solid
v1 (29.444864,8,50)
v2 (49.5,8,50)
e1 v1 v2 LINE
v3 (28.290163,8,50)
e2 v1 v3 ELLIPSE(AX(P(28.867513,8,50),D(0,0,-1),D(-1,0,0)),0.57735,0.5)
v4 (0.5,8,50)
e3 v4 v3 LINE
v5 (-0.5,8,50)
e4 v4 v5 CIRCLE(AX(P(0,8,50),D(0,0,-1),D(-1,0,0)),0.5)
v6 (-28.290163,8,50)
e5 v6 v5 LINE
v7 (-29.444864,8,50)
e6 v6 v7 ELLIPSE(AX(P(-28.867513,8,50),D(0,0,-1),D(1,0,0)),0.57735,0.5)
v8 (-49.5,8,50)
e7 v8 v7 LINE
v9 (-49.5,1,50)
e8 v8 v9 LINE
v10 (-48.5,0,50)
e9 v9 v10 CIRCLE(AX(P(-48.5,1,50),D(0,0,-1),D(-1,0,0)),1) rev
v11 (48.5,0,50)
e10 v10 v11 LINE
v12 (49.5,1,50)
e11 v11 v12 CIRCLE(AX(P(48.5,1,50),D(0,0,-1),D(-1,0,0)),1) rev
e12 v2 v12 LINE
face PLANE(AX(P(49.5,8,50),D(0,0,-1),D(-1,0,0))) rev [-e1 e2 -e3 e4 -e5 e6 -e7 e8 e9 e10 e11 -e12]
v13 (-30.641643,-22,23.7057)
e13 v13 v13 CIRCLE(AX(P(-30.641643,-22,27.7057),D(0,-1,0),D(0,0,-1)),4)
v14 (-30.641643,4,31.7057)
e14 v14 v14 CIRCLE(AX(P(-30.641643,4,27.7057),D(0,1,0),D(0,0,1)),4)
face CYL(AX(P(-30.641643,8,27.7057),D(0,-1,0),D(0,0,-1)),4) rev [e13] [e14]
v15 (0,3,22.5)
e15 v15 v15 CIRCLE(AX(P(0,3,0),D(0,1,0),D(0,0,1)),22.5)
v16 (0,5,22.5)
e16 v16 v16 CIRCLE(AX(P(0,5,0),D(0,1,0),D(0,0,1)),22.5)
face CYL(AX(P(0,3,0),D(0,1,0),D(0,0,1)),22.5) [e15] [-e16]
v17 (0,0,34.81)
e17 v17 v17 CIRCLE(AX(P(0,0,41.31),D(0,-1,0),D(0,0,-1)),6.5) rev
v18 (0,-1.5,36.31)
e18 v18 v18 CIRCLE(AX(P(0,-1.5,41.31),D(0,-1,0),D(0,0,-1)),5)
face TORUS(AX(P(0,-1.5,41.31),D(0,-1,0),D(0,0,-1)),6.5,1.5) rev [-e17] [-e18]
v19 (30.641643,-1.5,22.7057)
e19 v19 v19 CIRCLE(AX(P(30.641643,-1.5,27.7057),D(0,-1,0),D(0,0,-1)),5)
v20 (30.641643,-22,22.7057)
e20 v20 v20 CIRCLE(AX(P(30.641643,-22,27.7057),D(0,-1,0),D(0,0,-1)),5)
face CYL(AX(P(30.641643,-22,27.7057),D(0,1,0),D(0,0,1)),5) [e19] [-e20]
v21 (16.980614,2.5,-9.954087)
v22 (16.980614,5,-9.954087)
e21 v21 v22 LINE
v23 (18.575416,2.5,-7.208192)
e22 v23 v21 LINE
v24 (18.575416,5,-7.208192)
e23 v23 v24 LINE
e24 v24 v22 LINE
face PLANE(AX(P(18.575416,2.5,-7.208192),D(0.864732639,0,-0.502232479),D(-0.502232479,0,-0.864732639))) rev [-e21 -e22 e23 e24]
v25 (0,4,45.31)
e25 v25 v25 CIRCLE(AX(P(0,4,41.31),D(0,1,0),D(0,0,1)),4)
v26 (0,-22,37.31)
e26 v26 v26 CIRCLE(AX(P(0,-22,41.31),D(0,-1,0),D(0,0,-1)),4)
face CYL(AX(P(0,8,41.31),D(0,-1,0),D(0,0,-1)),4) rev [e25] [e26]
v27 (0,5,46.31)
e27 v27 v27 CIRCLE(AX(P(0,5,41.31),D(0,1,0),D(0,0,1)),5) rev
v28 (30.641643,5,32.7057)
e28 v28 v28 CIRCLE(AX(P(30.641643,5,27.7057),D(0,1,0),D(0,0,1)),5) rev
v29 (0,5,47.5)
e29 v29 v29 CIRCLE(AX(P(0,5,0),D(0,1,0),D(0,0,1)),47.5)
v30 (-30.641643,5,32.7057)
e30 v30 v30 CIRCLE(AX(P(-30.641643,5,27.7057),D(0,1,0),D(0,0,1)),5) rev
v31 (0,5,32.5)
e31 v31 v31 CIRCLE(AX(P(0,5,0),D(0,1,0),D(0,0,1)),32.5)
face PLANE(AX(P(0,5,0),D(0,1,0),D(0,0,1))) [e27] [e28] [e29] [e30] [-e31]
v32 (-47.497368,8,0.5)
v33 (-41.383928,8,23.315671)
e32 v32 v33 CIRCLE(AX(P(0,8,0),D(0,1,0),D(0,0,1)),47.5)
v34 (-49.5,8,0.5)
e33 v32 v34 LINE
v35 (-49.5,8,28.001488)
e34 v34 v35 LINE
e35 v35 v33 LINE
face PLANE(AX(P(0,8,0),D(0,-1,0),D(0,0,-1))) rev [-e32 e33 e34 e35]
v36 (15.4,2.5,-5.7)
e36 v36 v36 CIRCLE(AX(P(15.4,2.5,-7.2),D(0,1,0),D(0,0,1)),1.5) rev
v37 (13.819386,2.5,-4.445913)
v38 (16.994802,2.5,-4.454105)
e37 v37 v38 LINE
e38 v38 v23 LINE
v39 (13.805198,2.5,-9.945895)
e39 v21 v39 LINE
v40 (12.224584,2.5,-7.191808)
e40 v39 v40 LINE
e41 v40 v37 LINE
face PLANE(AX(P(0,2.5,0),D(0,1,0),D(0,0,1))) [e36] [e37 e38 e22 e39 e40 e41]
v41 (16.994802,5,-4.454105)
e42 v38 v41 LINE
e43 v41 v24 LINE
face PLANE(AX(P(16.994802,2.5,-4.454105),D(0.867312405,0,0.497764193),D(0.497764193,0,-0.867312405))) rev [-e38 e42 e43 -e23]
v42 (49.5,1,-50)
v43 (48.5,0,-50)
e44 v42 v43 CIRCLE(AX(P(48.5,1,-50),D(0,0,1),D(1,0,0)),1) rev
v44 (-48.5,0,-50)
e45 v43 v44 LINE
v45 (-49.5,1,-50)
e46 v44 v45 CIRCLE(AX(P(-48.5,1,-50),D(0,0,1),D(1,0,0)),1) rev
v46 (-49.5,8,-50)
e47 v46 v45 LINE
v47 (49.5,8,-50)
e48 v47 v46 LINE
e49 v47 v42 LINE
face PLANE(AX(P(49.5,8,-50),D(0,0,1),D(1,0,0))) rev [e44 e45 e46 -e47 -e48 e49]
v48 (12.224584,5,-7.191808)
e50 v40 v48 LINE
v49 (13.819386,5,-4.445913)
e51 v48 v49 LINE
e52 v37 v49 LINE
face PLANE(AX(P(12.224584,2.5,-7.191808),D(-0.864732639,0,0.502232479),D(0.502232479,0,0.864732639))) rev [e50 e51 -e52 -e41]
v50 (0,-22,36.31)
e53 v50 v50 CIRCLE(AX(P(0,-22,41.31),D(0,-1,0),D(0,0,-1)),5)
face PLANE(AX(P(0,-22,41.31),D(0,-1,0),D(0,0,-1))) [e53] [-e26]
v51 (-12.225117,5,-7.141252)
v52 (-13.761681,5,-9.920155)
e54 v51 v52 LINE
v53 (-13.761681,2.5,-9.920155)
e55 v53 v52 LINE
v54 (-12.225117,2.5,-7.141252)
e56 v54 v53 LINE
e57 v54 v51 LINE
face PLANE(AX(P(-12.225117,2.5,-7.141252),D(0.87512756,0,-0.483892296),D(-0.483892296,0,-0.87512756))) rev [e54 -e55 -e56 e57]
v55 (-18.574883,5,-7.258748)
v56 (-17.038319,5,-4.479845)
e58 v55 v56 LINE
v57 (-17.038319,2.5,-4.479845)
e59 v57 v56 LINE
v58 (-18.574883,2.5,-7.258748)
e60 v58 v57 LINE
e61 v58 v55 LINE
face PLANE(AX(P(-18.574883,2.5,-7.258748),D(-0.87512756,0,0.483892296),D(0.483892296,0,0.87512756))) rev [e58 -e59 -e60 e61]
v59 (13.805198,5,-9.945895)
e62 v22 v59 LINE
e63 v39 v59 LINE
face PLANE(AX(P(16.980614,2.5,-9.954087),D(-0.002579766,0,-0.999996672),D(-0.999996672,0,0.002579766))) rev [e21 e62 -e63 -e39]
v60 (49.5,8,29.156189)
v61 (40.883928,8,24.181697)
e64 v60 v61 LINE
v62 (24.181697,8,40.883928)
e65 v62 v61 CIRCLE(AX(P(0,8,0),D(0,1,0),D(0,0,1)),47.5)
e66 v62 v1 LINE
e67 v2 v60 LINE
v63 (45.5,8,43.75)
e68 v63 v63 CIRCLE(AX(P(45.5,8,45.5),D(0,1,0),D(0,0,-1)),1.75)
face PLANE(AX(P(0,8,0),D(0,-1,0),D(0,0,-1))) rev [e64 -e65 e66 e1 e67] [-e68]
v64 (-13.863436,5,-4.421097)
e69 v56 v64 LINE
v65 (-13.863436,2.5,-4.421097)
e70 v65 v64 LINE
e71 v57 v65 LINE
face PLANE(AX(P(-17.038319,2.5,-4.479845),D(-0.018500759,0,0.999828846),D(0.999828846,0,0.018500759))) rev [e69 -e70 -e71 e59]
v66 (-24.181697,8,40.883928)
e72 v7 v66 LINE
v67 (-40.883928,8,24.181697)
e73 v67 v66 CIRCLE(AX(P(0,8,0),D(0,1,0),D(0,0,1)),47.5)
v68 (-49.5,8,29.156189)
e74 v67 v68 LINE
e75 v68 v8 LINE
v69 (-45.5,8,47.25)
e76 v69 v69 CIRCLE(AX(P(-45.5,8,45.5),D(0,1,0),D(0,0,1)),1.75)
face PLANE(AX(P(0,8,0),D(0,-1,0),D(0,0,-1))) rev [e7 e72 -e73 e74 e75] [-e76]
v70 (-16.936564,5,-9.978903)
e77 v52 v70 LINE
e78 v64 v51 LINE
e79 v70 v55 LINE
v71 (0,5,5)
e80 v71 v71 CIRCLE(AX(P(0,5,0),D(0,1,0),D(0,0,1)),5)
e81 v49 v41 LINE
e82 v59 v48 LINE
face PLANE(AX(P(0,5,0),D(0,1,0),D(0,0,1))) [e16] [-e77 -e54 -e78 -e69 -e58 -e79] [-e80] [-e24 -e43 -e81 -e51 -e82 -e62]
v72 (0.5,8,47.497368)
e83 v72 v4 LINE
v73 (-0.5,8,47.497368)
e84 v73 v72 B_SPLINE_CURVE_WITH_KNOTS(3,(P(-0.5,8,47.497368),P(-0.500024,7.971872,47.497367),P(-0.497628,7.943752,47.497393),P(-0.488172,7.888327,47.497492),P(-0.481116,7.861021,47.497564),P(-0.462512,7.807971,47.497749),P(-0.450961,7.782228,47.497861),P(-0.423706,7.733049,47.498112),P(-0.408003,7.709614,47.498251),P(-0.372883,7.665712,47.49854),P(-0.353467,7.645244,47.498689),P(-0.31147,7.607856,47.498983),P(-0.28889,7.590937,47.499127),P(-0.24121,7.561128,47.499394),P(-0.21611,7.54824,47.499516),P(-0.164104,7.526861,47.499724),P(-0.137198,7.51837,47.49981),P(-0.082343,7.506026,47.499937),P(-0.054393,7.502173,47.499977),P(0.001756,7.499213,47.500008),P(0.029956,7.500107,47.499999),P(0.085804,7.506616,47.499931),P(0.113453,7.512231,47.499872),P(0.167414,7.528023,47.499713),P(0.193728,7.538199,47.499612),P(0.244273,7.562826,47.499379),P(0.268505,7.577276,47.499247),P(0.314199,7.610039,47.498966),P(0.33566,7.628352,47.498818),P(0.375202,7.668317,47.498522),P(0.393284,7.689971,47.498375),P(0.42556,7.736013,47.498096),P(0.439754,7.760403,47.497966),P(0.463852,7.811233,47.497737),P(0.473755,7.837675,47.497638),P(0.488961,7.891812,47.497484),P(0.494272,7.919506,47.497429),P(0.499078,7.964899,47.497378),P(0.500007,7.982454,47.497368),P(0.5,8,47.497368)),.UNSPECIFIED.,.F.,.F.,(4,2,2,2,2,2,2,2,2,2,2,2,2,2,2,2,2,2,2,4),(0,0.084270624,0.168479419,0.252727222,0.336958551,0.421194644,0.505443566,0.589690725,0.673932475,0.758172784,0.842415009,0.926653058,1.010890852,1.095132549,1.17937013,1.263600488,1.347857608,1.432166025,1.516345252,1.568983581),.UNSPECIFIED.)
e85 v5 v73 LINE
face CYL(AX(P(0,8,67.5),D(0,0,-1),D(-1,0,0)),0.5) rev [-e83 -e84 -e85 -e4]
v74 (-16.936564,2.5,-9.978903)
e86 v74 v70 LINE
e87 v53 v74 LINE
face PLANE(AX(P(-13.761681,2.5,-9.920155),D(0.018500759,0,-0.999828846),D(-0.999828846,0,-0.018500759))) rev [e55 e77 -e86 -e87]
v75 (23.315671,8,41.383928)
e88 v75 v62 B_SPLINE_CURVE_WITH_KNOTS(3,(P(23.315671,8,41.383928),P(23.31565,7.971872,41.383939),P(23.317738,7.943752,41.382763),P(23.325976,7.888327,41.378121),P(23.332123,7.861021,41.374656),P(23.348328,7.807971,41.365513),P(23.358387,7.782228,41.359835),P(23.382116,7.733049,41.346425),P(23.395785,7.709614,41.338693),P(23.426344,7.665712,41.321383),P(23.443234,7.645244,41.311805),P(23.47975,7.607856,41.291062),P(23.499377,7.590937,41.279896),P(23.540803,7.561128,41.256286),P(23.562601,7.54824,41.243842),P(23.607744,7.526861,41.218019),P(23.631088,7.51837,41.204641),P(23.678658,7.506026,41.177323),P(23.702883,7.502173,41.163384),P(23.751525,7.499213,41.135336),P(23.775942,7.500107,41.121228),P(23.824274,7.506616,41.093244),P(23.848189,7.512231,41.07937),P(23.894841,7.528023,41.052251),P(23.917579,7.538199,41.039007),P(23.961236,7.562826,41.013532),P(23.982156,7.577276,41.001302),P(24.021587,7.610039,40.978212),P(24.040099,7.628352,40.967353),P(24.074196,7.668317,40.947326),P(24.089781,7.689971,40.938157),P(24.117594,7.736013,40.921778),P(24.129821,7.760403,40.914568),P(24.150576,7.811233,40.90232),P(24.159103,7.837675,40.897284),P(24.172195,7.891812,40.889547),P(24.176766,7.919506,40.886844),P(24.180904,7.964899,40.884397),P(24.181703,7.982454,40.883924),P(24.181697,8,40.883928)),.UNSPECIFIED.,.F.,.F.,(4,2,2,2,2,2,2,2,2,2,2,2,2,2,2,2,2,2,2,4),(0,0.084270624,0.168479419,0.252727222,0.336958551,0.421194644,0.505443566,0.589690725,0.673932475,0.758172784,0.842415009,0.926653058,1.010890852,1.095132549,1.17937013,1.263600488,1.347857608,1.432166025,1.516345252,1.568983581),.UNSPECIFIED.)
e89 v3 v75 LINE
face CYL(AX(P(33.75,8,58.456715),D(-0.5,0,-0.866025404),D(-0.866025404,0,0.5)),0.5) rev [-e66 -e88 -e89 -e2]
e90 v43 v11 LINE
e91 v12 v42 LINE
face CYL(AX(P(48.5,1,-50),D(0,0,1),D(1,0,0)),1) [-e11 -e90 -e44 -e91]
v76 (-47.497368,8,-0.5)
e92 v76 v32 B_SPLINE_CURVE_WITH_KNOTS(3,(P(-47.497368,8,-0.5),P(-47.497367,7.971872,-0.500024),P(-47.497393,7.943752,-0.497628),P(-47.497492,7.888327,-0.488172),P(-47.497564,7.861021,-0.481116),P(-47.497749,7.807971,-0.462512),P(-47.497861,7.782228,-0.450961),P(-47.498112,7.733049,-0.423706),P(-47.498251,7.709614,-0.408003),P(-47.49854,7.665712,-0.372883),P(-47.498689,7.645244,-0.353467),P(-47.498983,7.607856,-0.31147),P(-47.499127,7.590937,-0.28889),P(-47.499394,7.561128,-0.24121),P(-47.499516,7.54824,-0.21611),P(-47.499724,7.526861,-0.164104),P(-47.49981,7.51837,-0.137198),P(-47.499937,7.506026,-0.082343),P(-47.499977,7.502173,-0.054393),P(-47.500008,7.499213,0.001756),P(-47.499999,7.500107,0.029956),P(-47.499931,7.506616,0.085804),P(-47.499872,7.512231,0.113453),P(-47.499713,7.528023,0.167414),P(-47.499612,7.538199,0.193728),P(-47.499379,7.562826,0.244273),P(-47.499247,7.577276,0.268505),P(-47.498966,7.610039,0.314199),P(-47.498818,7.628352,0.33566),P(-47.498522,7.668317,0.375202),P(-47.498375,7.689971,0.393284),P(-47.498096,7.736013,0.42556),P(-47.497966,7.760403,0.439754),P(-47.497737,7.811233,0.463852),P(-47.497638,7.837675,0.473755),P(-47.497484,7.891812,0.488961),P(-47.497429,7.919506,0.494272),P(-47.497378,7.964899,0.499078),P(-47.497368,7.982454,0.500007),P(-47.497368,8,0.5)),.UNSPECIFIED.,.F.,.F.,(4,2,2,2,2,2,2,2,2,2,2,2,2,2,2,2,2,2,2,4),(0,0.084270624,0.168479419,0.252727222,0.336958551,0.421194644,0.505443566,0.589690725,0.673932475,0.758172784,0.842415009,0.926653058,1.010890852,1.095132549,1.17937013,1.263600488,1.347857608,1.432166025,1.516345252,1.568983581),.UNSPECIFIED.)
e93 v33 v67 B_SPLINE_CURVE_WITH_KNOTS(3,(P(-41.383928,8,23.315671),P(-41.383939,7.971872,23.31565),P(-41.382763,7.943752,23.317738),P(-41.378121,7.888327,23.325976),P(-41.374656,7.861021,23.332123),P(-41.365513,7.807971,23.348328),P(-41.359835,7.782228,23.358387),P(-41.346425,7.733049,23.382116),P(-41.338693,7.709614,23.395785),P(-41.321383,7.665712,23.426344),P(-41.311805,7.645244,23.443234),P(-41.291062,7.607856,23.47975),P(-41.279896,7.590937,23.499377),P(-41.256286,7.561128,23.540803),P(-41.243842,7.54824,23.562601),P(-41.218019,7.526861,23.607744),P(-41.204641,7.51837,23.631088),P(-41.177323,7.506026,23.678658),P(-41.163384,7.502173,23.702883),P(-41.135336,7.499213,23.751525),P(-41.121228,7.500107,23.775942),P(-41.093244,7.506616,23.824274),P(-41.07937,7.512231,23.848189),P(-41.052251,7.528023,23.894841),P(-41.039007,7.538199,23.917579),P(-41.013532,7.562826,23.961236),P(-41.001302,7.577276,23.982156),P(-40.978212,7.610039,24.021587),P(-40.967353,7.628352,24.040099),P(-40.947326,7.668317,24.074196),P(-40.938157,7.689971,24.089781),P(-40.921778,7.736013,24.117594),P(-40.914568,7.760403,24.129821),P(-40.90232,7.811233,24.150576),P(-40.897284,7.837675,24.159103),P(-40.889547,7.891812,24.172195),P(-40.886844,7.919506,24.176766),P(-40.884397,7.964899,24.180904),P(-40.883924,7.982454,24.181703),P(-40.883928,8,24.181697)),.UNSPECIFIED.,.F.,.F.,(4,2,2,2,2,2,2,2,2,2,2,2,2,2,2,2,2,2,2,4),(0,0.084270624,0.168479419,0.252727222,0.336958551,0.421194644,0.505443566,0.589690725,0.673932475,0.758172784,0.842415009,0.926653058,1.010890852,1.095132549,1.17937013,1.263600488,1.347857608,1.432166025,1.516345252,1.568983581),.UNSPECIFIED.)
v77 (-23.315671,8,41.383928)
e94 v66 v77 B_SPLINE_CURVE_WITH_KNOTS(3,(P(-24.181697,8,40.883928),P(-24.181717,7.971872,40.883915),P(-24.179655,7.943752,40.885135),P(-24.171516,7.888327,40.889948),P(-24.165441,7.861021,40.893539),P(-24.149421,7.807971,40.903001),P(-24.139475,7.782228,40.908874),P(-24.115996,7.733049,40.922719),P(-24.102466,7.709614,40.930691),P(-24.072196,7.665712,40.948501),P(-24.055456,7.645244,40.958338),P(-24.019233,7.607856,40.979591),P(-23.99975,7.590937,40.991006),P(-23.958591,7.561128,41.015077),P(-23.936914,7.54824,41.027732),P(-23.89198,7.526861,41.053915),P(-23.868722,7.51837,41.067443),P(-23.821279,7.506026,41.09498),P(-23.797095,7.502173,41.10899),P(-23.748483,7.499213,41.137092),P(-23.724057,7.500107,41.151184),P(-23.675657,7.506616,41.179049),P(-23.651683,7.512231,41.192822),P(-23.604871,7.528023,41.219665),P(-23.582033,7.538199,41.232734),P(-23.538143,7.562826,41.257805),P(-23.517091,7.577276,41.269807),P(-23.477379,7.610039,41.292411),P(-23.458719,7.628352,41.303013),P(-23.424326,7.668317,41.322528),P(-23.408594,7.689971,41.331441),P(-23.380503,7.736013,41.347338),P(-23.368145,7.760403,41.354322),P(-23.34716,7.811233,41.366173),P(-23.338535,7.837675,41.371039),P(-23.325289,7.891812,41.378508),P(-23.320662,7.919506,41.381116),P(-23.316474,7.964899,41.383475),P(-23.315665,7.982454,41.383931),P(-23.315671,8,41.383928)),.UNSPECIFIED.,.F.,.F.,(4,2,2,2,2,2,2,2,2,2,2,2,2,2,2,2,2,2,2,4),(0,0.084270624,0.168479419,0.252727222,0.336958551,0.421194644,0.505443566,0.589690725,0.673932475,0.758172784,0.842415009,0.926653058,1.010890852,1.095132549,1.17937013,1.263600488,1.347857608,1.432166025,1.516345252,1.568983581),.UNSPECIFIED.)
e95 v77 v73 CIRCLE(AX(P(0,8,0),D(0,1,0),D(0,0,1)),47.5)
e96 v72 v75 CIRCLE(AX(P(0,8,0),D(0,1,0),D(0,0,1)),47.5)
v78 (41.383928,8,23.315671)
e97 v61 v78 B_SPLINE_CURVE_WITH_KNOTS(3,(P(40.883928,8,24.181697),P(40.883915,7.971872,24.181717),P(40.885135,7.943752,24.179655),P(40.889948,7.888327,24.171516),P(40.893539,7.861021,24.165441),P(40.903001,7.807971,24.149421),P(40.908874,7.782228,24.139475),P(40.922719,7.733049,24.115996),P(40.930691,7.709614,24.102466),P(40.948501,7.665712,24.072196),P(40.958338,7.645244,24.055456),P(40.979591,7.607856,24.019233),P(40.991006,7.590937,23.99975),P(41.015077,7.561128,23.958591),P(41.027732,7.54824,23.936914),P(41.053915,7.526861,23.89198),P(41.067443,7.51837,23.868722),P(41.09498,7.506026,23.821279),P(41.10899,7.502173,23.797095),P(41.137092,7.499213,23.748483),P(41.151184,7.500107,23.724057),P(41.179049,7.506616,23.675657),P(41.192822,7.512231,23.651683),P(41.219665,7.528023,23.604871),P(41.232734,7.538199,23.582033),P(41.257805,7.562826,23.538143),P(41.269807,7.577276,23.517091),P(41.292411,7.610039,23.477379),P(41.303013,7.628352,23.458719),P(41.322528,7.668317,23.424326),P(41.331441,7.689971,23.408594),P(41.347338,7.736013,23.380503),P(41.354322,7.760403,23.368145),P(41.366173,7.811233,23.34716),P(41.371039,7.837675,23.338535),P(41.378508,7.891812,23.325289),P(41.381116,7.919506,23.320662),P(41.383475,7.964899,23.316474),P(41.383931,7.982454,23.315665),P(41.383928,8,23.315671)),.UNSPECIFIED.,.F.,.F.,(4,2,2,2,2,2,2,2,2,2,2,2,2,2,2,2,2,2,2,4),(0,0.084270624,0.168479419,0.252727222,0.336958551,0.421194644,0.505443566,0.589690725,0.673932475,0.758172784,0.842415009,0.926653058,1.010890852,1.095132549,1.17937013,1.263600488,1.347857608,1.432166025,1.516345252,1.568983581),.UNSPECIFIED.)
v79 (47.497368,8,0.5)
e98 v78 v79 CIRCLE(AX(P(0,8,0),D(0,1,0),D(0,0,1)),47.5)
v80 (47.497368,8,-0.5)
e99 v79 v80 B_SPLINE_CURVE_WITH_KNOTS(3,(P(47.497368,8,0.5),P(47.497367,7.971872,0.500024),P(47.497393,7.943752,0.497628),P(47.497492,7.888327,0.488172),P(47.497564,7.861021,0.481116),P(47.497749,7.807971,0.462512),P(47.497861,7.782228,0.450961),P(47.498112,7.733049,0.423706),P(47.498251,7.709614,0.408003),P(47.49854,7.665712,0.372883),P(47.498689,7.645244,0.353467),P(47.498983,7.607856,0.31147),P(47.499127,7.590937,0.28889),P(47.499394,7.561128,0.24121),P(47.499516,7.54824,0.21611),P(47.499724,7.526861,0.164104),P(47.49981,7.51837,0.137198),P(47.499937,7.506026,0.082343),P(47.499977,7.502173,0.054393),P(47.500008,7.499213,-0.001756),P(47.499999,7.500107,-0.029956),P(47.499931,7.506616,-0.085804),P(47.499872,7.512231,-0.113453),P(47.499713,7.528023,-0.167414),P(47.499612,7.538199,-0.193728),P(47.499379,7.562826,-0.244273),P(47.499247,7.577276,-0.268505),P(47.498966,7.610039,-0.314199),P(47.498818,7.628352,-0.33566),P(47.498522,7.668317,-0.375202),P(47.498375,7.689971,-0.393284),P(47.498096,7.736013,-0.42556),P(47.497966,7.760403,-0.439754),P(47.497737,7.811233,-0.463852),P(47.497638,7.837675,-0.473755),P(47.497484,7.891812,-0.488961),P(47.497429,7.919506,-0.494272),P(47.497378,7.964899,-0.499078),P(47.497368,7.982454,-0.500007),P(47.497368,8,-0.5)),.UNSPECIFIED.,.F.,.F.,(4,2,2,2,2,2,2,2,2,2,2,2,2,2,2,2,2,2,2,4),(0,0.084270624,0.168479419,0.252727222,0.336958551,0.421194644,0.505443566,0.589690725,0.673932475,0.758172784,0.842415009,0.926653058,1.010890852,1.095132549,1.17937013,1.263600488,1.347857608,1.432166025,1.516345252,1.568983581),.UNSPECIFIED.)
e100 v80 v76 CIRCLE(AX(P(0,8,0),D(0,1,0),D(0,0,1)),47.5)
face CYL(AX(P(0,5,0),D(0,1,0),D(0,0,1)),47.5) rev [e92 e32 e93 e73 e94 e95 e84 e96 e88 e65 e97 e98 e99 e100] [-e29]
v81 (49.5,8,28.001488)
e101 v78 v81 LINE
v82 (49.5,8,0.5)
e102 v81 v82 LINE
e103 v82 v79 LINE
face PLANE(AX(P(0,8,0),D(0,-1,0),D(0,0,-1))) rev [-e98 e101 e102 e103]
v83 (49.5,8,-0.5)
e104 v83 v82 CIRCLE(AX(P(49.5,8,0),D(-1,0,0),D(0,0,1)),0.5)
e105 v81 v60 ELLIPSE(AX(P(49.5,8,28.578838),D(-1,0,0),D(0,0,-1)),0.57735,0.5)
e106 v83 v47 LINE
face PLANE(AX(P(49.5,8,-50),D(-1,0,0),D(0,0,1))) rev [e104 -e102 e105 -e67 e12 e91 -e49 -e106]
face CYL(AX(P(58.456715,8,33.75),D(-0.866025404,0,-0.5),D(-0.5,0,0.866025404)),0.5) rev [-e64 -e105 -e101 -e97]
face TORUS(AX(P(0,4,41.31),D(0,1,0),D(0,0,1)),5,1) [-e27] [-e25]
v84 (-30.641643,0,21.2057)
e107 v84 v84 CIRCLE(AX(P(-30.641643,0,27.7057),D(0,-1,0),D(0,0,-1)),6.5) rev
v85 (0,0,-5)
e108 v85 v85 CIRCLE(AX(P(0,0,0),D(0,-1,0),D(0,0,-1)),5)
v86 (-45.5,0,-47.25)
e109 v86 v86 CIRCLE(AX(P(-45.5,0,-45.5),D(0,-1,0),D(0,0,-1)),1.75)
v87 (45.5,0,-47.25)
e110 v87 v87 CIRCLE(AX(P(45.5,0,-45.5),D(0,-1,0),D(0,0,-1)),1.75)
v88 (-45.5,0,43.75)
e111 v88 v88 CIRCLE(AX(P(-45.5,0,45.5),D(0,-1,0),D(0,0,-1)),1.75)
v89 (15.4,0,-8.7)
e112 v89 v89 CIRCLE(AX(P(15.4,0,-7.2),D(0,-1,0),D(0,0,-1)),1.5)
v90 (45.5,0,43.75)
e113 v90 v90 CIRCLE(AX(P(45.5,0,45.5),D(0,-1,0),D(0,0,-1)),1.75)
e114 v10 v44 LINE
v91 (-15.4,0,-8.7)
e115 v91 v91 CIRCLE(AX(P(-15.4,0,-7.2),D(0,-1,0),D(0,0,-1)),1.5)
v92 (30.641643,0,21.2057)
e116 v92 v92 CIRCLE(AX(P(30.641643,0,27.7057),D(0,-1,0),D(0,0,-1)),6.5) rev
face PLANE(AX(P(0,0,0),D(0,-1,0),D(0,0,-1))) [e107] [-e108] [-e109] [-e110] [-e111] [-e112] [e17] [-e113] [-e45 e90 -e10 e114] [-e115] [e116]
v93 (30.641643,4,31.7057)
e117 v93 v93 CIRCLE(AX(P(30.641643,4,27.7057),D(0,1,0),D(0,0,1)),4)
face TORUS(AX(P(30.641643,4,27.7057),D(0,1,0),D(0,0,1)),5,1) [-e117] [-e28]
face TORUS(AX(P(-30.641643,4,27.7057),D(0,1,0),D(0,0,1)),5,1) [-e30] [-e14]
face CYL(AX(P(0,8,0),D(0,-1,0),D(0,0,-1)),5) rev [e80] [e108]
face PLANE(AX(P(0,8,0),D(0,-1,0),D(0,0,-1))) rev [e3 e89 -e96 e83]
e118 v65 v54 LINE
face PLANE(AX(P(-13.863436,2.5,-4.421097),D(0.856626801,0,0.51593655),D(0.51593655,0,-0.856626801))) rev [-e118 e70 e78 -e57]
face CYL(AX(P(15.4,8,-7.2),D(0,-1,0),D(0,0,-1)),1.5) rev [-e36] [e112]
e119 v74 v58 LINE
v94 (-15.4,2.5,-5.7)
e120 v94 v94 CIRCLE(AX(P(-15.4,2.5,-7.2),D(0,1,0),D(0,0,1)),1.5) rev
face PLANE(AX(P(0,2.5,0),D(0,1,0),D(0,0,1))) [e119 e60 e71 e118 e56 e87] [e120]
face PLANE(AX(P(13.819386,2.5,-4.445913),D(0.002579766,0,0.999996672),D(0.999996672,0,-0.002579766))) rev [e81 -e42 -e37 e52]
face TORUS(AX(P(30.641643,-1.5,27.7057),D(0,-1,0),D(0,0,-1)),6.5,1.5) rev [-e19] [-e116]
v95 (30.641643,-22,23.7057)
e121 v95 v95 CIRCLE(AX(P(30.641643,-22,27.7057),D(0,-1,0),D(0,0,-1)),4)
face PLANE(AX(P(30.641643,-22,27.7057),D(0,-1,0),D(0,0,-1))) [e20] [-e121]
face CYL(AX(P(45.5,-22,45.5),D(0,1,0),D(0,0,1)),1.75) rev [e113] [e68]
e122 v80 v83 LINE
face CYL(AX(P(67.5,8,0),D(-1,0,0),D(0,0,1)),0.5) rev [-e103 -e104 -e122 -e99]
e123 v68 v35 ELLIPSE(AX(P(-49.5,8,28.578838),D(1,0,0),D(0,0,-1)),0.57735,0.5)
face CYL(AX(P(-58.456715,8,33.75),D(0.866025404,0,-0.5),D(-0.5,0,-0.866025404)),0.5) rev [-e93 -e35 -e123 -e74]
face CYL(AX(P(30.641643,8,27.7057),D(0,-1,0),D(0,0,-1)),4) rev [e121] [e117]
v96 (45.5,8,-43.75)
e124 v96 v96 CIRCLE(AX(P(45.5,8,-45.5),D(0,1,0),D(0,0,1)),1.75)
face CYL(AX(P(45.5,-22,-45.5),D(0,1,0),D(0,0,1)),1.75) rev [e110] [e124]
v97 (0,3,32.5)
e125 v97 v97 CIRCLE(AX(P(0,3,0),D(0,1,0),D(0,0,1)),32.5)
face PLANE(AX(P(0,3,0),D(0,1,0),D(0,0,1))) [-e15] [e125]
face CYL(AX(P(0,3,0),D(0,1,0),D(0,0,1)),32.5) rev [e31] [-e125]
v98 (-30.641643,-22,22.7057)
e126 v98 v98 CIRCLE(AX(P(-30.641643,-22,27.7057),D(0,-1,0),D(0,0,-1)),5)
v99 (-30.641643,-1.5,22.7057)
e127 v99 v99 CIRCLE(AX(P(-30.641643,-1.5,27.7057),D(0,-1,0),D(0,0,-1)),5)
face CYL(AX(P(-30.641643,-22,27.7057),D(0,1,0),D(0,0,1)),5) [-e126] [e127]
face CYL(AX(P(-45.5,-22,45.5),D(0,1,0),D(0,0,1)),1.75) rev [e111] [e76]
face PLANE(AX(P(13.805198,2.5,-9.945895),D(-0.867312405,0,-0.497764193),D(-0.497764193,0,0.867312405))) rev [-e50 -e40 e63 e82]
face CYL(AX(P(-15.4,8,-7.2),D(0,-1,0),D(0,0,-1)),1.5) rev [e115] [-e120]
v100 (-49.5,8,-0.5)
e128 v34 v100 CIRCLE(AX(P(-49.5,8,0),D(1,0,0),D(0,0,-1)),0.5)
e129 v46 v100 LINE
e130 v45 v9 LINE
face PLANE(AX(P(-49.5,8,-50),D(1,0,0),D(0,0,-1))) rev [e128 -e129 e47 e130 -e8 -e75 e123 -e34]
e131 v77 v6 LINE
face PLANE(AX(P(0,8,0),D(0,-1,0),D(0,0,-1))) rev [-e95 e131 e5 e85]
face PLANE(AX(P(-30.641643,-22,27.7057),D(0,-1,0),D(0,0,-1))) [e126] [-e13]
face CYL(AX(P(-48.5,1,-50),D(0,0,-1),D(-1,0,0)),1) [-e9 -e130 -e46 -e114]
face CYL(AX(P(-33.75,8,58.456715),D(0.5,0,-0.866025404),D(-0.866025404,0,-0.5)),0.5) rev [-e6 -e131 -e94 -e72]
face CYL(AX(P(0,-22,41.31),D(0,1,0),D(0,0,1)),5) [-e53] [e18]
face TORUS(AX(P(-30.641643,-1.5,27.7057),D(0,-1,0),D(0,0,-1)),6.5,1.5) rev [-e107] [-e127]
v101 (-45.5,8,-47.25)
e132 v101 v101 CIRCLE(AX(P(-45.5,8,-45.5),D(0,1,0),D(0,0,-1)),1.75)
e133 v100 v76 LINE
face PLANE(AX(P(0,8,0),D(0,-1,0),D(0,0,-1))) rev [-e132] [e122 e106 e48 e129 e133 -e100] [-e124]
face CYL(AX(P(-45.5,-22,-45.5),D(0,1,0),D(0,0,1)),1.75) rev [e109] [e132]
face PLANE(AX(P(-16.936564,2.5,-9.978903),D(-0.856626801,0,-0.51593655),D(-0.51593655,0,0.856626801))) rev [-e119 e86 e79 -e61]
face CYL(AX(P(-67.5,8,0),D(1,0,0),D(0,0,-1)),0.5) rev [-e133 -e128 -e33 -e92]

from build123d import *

# Parameters (mm, degrees)
SKETCH1_W           = 99
SKETCH1_H           = 100
BOSS_EXTRUDE1_DEPTH = 8
SKETCH2_R           = 47.5
CUT_EXTRUDE1_DEPTH  = 3
SKETCH3_R           = 4
CUT_EXTRUDE2_DEPTH  = 71.811369144
SKETCH7_R           = 32.5
SKETCH7_R_2         = 22.5
CUT_EXTRUDE3_DEPTH  = 2
SKETCH8_R           = 5
CUT_EXTRUDE4_DEPTH  = 71.811369144
SKETCH10_R          = 1.5
CUT_EXTRUDE6_DEPTH  = 71.811369144
CUT_EXTRUDE7_DEPTH  = 2.5
BOSS_EXTRUDE2_START = 22
SKETCH14_R          = 5
SKETCH14_R_2        = 4
BOSS_EXTRUDE2_DEPTH = 22
SKETCH15_R          = 1.75
CUT_EXTRUDE8_DEPTH  = 77.486926988
FILLET3_R           = 1.5
FILLET4_R           = 1
FILLET6_R           = 1
CUT_SWEEP2_START    = -49.5
CUT_SWEEP2_DEPTH    = 2.002631778
CIRPATTERN4_START   = 47.497368222
CIRPATTERN4_DEPTH   = 2.002631778
CIRPATTERN4_START_2 = -57.446351884
CIRPATTERN4_2_DEPTH = 9.948983662
CIRPATTERN4_START_3 = -58.023702154
CIRPATTERN4_3_DEPTH = 10.526333932
CIRPATTERN4_4_DEPTH = 2.502631778
CIRPATTERN4_5_DEPTH = 10.526333932
CIRPATTERN4_6_DEPTH = 9.948983662


# Read off the part's stored shape, not the designer's step: Cut-Sweep2, CirPattern4
with BuildPart() as part:
    # Sketch1 → Boss-Extrude1 (new body)
    with BuildSketch(Plane(origin=(0, 0, 0), x_dir=(1, 0, 0), z_dir=(0, 1, 0))):
        Rectangle(SKETCH1_W, SKETCH1_H)
    extrude(amount=BOSS_EXTRUDE1_DEPTH)

    # Sketch2 → Cut-Extrude1 (cut)
    with BuildSketch(Plane(origin=(0, 8, 0), x_dir=(1, 0, 0), z_dir=(0, 1, 0))):
        with Locations(Location((0, 0, 0), (0, 0, 270))):
            Circle(SKETCH2_R)
    extrude(amount=-CUT_EXTRUDE1_DEPTH, mode=Mode.SUBTRACT)

    # Sketch3 → Cut-Extrude2 (cut, through all)
    with BuildSketch(Plane.XZ):
        with Locations(Location((0, 41.31, 0), (0, 0, 270))):
            Circle(SKETCH3_R)
        with Locations(Location((-30.641642767, 27.70570029, 0), (0, 0, 270))):
            Circle(SKETCH3_R)
        with Locations(Location((30.641642767, 27.70570029, 0), (0, 0, 270))):
            Circle(SKETCH3_R)
    extrude(amount=-CUT_EXTRUDE2_DEPTH, mode=Mode.SUBTRACT)

    # Sketch7 → Cut-Extrude3 (cut)
    with BuildSketch(Plane(origin=(0, 5, 0), x_dir=(1, 0, 0), z_dir=(0, 1, 0))):
        with Locations(Location((0, 0, 0), (0, 0, 270))):
            Circle(SKETCH7_R)
        with Locations(Location((0, 0, 0), (0, 0, 270))):
            Circle(SKETCH7_R_2, mode=Mode.SUBTRACT)
    extrude(amount=-CUT_EXTRUDE3_DEPTH, mode=Mode.SUBTRACT)

    # Sketch8 → Cut-Extrude4 (cut, through all)
    with BuildSketch(Plane.XZ):
        with Locations(Location((0, 0, 0), (0, 0, 270))):
            Circle(SKETCH8_R)
    extrude(amount=-CUT_EXTRUDE4_DEPTH, mode=Mode.SUBTRACT)

    # Sketch10 → Cut-Extrude6 (cut, through all)
    with BuildSketch(Plane.XZ):
        with Locations(Location((-15.4, -7.2, 0), (0, 0, 270))):
            Circle(SKETCH10_R)
        with Locations(Location((15.4, -7.2, 0), (0, 0, 270))):
            Circle(SKETCH10_R)
    extrude(amount=-CUT_EXTRUDE6_DEPTH, mode=Mode.SUBTRACT)

    # Sketch13 → Cut-Extrude7 (cut)
    with BuildSketch(Plane(origin=(0, 5, 0), x_dir=(1, 0, 0), z_dir=(0, 1, 0))):
        Polygon((-13.86343559, 4.421096773), (-12.225117005, 7.1412522), (-13.761681416, 9.920155427), (-16.93656441, 9.978903227), (-18.574882995, 7.2587478), (-17.038318584, 4.479844573), align=None)
        Polygon((16.994802314, 4.45410508), (18.575415914, 7.208191857), (16.9806136, 9.954086778), (13.805197686, 9.94589492), (12.224584086, 7.191808143), (13.8193864, 4.445913222), align=None)
    extrude(amount=-CUT_EXTRUDE7_DEPTH, mode=Mode.SUBTRACT)

    # Sketch14 → Boss-Extrude2 (add)
    # profile 1 of 3: a face of its own
    with BuildSketch(Plane.XZ.offset(BOSS_EXTRUDE2_START)):
        with Locations(Location((0, 41.31, 0), (0, 0, 270))):
            Circle(SKETCH14_R)
        with Locations(Location((0, 41.31, 0), (0, 0, 270))):
            Circle(SKETCH14_R_2, mode=Mode.SUBTRACT)
    # profile 2 of 3: a face of its own
    with BuildSketch(Plane.XZ.offset(BOSS_EXTRUDE2_START)):
        with Locations(Location((-30.641642767, 27.70570029, 0), (0, 0, 270))):
            Circle(SKETCH14_R)
        with Locations(Location((-30.641642767, 27.70570029, 0), (0, 0, 270))):
            Circle(SKETCH14_R_2, mode=Mode.SUBTRACT)
    # profile 3 of 3: a face of its own
    with BuildSketch(Plane.XZ.offset(BOSS_EXTRUDE2_START)):
        with Locations(Location((30.641642767, 27.70570029, 0), (0, 0, 270))):
            Circle(SKETCH14_R)
        with Locations(Location((30.641642767, 27.70570029, 0), (0, 0, 270))):
            Circle(SKETCH14_R_2, mode=Mode.SUBTRACT)
    extrude(amount=-BOSS_EXTRUDE2_DEPTH)

    # Sketch15 → Cut-Extrude8 (cut, through all)
    with BuildSketch(Plane(origin=(0, 8, 0), x_dir=(1, 0, 0), z_dir=(0, 1, 0))):
        with Locations(Location((-45.5, -45.5, 0), (0, 0, 270))):
            Circle(SKETCH15_R)
        with Locations(Location((45.5, -45.5, 0), (0, 0, 90))):
            Circle(SKETCH15_R)
        with Locations(Location((45.5, 45.5, 0), (0, 0, 270))):
            Circle(SKETCH15_R)
        with Locations(Location((-45.5, 45.5, 0), (0, 0, 90))):
            Circle(SKETCH15_R)
    extrude(amount=-CUT_EXTRUDE8_DEPTH, mode=Mode.SUBTRACT)

    # Fillet3
    fillet3_edges = [part.edges().sort_by_distance(p)[0] for p in [
        (0, 0, 46.31),
        (-30.641642767, 0, 32.70570029),
        (30.641642767, 0, 32.70570029),
    ]]
    fillet(fillet3_edges, radius=FILLET3_R)

    # Fillet4
    fillet4_edges = [part.edges().sort_by_distance(p)[0] for p in [
        (49.5, 0, 0),
        (-49.5, 0, 0),
    ]]
    fillet(fillet4_edges, radius=FILLET4_R)

    # Fillet6
    fillet6_edges = [part.edges().sort_by_distance(p)[0] for p in [
        (0, 5, 45.31),
        (-30.641642767, 5, 31.70570029),
        (30.641642767, 5, 31.70570029),
    ]]
    fillet(fillet6_edges, radius=FILLET6_R)

    # Cut-Sweep2 outline → Cut-Sweep2 (cut)
    with BuildSketch(Plane.YZ.offset(CUT_SWEEP2_START)):
        with BuildLine():
            Line((8, -0.5), (8, 0.5))
            ThreePointArc((8, 0.5), (7.5, 0), (8, -0.5))
        make_face()
    extrude(amount=CUT_SWEEP2_DEPTH, mode=Mode.SUBTRACT)

    # CirPattern4 outline → CirPattern4 (cut)
    with BuildSketch(Plane.YZ.offset(CIRPATTERN4_START)):
        with BuildLine():
            ThreePointArc((8, 0.5), (7.5, 0), (8, -0.5))
            Line((8, -0.5), (8, 0.5))
        make_face()
    extrude(amount=CIRPATTERN4_DEPTH, mode=Mode.SUBTRACT)

    # CirPattern4 2 outline → CirPattern4 2 (cut)
    with BuildSketch(Plane(origin=(0, 0, 0), x_dir=(0.5000000000000016, 0, 0.8660254037844377), z_dir=(0.8660254037844377, 0, -0.5000000000000018)).offset(CIRPATTERN4_START_2)):
        with BuildLine():
            Line((-0.5, -8), (0.5, -8))
            ThreePointArc((0.5, -8), (0, -7.5), (-0.5, -8))
        make_face()
    extrude(amount=CIRPATTERN4_2_DEPTH, mode=Mode.SUBTRACT)

    # CirPattern4 3 outline → CirPattern4 3 (cut)
    with BuildSketch(Plane(origin=(0, 0, 0), x_dir=(0.8660254037844403, 0, 0.49999999999999717), z_dir=(0.49999999999999717, 0, -0.8660254037844404)).offset(CIRPATTERN4_START_3)):
        with BuildLine():
            Line((-0.5, -8), (0.5, -8))
            ThreePointArc((0.5, -8), (0, -7.5), (-0.5, -8))
        make_face()
    extrude(amount=CIRPATTERN4_3_DEPTH, mode=Mode.SUBTRACT)

    # CirPattern4 4 outline → CirPattern4 4 (cut)
    with BuildSketch(Plane.XY.offset(CIRPATTERN4_START)):
        with BuildLine():
            ThreePointArc((-0.5, 8), (0, 7.5), (0.5, 8))
            Line((0.5, 8), (-0.5, 8))
        make_face()
    extrude(amount=CIRPATTERN4_4_DEPTH, mode=Mode.SUBTRACT)

    # CirPattern4 5 outline → CirPattern4 5 (cut)
    with BuildSketch(Plane(origin=(0, 0, 0), x_dir=(0.8660254037844362, 0, -0.5000000000000042), z_dir=(0.5000000000000042, 0, 0.8660254037844363)).offset(CIRPATTERN4_START)):
        with BuildLine():
            ThreePointArc((-0.5, 8), (0, 7.5), (0.5, 8))
            Line((0.5, 8), (-0.5, 8))
        make_face()
    extrude(amount=CIRPATTERN4_5_DEPTH, mode=Mode.SUBTRACT)

    # CirPattern4 6 outline → CirPattern4 6 (cut)
    with BuildSketch(Plane(origin=(0, 0, 0), x_dir=(0.4999999999999938, 0, -0.8660254037844423), z_dir=(0.8660254037844421, 0, 0.49999999999999406)).offset(CIRPATTERN4_START)):
        with BuildLine():
            ThreePointArc((-0.5, 8), (0, 7.5), (0.5, 8))
            Line((0.5, 8), (-0.5, 8))
        make_face()
    extrude(amount=CIRPATTERN4_6_DEPTH, mode=Mode.SUBTRACT)


solid = part.part
